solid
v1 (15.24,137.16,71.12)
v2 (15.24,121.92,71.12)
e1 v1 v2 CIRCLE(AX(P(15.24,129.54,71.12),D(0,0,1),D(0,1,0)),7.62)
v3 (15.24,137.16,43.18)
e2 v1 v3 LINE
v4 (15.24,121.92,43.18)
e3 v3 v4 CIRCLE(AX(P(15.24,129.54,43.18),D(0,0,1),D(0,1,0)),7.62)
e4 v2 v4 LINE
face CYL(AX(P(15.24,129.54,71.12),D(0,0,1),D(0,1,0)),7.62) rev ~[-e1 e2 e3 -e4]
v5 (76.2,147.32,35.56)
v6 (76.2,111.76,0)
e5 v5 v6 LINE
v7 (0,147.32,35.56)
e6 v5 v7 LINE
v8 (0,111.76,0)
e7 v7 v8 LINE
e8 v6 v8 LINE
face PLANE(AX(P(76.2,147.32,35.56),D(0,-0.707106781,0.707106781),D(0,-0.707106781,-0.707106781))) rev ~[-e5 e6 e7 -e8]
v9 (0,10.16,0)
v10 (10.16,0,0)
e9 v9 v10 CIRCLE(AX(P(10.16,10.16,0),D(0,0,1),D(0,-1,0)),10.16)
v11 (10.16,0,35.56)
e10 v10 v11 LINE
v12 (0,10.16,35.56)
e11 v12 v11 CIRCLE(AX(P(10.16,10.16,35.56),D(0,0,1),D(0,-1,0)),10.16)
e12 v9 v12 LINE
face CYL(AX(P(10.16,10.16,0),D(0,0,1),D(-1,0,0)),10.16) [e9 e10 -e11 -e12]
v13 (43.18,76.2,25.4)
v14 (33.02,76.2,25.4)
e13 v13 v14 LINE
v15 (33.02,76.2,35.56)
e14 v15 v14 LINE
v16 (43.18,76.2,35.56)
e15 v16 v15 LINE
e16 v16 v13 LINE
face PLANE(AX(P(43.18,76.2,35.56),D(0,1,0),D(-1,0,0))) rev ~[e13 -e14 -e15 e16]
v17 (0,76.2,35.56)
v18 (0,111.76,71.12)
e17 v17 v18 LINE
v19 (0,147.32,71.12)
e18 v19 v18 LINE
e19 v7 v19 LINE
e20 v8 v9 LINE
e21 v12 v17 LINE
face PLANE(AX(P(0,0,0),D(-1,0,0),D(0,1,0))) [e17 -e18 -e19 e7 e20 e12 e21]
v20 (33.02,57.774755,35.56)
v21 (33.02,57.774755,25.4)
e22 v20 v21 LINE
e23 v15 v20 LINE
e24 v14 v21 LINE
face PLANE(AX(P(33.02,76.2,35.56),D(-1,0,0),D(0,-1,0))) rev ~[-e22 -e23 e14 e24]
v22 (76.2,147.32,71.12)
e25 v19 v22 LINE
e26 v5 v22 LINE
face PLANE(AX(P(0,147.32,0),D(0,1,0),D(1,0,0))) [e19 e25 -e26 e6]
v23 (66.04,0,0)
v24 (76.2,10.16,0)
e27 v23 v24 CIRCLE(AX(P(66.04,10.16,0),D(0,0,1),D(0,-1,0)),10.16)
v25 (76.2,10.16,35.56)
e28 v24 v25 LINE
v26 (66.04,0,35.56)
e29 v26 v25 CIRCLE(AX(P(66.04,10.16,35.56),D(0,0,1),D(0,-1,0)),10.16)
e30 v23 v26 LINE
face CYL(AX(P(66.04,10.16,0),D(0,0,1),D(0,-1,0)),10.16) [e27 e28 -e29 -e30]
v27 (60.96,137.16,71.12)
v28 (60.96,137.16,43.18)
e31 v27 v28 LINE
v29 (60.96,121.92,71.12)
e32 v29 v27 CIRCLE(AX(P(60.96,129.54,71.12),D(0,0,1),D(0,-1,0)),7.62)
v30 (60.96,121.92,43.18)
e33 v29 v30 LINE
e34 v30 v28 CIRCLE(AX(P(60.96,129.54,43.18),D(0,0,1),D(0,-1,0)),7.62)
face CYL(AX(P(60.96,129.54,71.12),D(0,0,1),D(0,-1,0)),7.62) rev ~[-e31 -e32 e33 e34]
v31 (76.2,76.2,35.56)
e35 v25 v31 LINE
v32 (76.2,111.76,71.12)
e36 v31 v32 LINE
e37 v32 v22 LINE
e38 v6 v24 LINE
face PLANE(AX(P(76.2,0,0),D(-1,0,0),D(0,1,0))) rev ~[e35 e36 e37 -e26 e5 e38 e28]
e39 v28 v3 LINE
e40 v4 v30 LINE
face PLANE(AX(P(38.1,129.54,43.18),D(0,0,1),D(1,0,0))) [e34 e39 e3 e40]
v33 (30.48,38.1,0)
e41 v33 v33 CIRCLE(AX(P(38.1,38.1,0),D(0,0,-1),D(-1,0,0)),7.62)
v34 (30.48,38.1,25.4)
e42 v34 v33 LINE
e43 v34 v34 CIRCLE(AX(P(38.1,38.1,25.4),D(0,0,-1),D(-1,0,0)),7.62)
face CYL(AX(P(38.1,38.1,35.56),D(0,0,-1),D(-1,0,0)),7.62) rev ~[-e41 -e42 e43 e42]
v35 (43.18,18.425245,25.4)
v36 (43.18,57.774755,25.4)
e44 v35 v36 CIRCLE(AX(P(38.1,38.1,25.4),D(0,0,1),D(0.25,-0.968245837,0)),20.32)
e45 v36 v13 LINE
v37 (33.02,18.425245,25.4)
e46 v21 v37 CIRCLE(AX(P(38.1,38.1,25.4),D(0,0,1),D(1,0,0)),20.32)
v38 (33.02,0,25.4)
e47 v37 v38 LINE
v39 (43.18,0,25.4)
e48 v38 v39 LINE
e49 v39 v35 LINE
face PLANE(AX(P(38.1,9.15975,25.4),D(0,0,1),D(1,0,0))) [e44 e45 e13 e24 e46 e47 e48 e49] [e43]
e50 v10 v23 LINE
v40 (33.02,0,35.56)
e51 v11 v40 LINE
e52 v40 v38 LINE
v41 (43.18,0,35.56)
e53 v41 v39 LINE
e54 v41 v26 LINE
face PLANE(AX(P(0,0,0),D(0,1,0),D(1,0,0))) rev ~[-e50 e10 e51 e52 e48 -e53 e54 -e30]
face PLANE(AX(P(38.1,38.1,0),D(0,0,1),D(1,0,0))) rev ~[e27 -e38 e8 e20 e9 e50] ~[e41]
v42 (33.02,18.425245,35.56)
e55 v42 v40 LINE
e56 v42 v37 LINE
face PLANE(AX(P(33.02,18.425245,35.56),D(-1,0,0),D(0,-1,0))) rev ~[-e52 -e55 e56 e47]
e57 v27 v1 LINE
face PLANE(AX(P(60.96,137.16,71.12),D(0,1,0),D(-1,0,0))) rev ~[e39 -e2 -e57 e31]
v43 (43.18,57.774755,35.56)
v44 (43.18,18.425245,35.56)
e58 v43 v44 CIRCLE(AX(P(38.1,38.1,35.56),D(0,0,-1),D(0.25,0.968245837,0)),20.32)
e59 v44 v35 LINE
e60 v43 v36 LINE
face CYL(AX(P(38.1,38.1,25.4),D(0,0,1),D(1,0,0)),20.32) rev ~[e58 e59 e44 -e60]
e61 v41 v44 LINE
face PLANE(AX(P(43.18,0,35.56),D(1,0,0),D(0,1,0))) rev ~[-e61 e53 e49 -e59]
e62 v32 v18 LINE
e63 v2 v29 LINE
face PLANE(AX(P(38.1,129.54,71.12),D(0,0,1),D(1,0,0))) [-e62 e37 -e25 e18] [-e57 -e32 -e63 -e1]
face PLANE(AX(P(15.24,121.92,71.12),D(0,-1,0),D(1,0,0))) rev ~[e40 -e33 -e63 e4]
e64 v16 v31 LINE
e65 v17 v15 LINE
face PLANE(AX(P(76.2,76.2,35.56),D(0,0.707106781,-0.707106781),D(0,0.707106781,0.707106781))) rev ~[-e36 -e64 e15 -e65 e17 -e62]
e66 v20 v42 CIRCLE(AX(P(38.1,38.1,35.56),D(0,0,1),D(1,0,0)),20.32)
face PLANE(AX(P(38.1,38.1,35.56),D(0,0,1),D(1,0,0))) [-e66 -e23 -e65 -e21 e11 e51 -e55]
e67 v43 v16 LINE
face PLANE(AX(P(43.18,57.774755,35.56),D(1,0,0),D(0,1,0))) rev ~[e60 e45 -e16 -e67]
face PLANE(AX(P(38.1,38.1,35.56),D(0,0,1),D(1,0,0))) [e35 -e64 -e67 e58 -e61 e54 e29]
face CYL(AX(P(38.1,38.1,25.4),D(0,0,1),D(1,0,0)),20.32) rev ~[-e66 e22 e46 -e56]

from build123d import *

# Parameters (mm, degrees)
F0_W           = 76.2
F0_H           = 35.56
F1_DEPTH       = 71.12
F0_H_2         = 76.2
F2_DEPTH       = 35.56
F4_DEPTH       = 76.2
F6_D           = 15.24
F6_CBORE_D     = 40.64
F6_CBORE_DEPTH = 10.16
F8_DEPTH       = 27.94
F10_DEPTH      = 10.16
F11_R          = 10.16


with BuildPart() as f1:
    # F0 (on Top) → F1 (new body)
    with BuildSketch(Plane.XY):
        with Locations((38.1, 129.54)):
            Rectangle(F0_W, F0_H)
        with Locations((38.1, 93.98)):
            Rectangle(F0_W, F0_H)
    extrude(amount=F1_DEPTH)

    # F0 (on Top) → F2 (join)
    with BuildSketch(Plane.XY):
        with Locations((38.1, 38.1)):
            Rectangle(F0_W, F0_H_2)
    extrude(amount=F2_DEPTH)

    # F3 (on face) → F4 (cut)
    with BuildSketch(Plane.YZ.offset(76.2)):
        Polygon((76.2, 71.12), (76.2, 35.56), (111.76, 71.12), align=None)
        Polygon((147.32, 0), (147.32, 35.56), (111.76, 0), align=None)
    extrude(amount=-F4_DEPTH, mode=Mode.SUBTRACT)

    # F6 (through all)
    with Locations(Plane.XY.offset(35.56)):
        with Locations((38.1, 38.1)):
            CounterBoreHole(F6_D / 2, F6_CBORE_D / 2, F6_CBORE_DEPTH)

    # F7 (on face) → F8 (cut)
    with BuildSketch(Plane.XY.offset(71.12)):
        with BuildLine():
            Line((60.96, 137.16), (15.24, 137.16))
            ThreePointArc((15.24, 137.16), (7.62, 129.54), (15.24, 121.92))
            Line((15.24, 121.92), (60.96, 121.92))
            ThreePointArc((60.96, 121.92), (68.58, 129.54), (60.96, 137.16))
        make_face()
    extrude(amount=-F8_DEPTH, mode=Mode.SUBTRACT)

    # F9 (on face) → F10 (cut)
    with BuildSketch(Plane.XY.offset(35.56)):
        with BuildLine():
            Line((43.18, 76.2), (33.02, 76.2))
            Line((33.02, 76.2), (33.02, 57.7747553987))
            ThreePointArc((33.02, 57.7747553987), (38.1, 58.42), (43.18, 57.7747553987))
            Line((43.18, 57.7747553987), (43.18, 76.2))
        make_face()
        with BuildLine():
            ThreePointArc((43.18, 18.4252446013), (38.1, 17.78), (33.02, 18.4252446013))
            Line((33.02, 18.4252446013), (33.02, 0))
            Line((33.02, 0), (43.18, 0))
            Line((43.18, 0), (43.18, 18.4252446013))
        make_face()
    extrude(amount=-F10_DEPTH, mode=Mode.SUBTRACT)

    # F11
    f11_edges = [f1.edges().sort_by_distance(p)[0] for p in [
        (76.2, 0, 17.78),
        (0, 0, 17.78),
    ]]
    fillet(f11_edges, radius=F11_R)


solid = f1.part
